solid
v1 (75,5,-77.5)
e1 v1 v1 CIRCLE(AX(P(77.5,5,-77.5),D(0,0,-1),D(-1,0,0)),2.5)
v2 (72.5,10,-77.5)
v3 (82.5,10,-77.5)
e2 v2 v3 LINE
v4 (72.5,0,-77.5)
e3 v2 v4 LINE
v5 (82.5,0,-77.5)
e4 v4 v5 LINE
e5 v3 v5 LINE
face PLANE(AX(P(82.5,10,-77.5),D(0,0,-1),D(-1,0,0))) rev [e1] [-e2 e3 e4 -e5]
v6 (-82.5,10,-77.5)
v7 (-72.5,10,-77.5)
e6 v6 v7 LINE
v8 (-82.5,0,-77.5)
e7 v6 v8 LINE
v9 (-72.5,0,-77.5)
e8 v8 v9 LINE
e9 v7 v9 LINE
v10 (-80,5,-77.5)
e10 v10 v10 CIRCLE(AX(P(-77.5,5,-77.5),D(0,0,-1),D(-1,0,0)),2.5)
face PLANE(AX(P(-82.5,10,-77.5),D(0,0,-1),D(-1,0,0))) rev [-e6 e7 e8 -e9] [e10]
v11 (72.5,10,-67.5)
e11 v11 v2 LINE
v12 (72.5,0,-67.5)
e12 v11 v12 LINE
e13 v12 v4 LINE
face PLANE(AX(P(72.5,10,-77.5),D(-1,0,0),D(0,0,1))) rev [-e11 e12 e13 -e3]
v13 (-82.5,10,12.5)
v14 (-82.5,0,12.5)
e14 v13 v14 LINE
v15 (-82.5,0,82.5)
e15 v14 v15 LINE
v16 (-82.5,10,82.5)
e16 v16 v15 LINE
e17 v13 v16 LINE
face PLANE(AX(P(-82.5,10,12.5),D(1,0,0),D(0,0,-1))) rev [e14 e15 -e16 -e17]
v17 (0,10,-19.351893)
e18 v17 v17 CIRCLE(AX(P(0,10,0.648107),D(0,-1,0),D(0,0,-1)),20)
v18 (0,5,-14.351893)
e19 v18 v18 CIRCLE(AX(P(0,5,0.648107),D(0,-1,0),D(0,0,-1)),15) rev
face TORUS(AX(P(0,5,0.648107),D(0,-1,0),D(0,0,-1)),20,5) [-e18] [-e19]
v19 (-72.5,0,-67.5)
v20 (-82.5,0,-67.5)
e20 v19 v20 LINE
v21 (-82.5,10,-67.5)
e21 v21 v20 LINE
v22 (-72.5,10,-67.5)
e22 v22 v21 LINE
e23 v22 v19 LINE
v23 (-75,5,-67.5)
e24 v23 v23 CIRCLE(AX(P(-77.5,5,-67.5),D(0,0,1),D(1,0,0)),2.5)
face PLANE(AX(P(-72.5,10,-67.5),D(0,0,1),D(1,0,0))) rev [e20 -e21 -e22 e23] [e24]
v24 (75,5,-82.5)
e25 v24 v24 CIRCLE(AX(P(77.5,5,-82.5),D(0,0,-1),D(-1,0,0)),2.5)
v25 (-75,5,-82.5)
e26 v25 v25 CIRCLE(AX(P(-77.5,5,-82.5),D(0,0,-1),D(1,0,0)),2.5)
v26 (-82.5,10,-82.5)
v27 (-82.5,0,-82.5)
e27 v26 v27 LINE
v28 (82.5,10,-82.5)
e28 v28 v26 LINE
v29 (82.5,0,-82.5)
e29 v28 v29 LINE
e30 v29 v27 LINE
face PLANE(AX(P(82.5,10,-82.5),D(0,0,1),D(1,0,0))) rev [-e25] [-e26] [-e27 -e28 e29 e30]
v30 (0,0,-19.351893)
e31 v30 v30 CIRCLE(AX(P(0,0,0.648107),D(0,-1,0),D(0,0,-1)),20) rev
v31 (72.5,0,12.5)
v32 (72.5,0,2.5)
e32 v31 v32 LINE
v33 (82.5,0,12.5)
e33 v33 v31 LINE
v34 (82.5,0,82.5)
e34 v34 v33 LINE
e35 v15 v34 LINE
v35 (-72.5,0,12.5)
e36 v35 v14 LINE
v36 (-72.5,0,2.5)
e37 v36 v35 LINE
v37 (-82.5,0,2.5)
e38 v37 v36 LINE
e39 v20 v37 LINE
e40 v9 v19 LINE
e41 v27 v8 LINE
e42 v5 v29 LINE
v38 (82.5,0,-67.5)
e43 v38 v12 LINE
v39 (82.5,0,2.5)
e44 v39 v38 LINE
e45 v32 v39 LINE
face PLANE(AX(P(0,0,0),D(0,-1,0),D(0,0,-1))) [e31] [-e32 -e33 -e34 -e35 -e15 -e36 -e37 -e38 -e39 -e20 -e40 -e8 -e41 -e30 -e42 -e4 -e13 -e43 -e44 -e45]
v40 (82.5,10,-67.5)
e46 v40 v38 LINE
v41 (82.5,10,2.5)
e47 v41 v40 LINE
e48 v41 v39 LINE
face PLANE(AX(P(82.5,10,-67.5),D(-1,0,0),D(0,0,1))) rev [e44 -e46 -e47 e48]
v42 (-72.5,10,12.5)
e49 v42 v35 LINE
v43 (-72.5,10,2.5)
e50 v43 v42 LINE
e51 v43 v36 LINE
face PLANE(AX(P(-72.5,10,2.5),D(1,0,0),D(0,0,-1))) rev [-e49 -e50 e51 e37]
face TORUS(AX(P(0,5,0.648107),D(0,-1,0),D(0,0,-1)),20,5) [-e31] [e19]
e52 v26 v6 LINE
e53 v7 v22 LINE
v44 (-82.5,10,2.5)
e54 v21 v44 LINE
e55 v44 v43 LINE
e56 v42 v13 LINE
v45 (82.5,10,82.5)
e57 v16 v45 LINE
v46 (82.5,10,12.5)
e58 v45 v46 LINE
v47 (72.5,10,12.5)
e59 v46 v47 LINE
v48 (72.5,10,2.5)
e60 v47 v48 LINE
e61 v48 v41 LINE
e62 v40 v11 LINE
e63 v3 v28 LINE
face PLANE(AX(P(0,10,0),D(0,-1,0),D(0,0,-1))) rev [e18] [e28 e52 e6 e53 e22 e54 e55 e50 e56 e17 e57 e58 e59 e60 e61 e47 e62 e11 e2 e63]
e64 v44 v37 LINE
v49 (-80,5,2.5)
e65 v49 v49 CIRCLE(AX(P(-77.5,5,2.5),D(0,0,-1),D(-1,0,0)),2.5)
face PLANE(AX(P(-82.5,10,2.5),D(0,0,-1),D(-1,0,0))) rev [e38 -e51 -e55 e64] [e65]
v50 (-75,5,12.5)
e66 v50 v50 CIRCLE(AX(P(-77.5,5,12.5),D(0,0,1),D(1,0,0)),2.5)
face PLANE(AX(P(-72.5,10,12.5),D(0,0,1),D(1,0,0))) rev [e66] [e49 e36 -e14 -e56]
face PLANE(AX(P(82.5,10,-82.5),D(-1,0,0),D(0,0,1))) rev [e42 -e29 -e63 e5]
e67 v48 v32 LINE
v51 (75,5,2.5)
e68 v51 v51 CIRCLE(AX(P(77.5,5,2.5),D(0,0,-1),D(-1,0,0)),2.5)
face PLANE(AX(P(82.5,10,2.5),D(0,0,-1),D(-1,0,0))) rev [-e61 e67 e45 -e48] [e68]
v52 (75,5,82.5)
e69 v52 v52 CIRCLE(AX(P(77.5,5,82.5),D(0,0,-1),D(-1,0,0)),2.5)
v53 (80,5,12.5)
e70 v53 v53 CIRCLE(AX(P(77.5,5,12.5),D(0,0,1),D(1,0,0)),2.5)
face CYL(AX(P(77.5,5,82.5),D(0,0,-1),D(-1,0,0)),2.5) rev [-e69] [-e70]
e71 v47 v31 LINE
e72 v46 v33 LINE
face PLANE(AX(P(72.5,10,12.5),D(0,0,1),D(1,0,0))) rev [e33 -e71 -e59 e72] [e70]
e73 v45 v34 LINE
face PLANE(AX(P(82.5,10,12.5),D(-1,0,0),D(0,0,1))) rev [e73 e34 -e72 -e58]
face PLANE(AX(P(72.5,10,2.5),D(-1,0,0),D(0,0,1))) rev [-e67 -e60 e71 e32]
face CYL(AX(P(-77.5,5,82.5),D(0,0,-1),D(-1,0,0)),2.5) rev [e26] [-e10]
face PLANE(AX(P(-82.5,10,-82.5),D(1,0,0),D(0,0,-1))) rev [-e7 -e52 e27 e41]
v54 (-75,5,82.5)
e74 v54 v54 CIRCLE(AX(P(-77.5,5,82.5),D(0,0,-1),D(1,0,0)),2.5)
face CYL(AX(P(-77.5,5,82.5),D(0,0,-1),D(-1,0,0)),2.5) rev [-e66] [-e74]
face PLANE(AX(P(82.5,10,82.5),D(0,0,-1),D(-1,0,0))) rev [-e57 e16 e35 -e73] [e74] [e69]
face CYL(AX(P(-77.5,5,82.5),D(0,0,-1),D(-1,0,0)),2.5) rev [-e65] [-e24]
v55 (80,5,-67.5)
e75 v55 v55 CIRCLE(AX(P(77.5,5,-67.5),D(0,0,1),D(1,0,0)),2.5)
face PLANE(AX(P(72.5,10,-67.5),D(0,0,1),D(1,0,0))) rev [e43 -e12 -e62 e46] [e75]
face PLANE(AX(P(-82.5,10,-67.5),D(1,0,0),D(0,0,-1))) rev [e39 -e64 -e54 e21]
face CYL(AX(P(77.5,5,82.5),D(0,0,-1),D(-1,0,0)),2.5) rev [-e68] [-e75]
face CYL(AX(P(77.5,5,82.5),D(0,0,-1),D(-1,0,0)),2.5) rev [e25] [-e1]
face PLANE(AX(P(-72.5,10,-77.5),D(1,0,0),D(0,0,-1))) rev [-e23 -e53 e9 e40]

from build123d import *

# Parameters (mm, degrees)
ESQUISSE1_R    = 15
BASE_DEPTH     = 10
ESQUISSE2_R    = 2.5
VIDE_VIS_DEPTH = 185.746447868
CONGE_CABLE_R  = 5


with BuildPart() as part:
    # Esquisse1 → BASE (new body)
    with BuildSketch(Plane(origin=(0, 0, 0), x_dir=(1, 0, 0), z_dir=(0, 1, 0))):
        Polygon((-82.5, 77.5), (-72.5, 77.5), (-72.5, 67.5), (-82.5, 67.5), (-82.5, -2.5), (-72.5, -2.5), (-72.5, -12.5), (-82.5, -12.5), (-82.5, -82.5), (82.5, -82.5), (82.5, -12.5), (72.5, -12.5), (72.5, -2.5), (82.5, -2.5), (82.5, 67.5), (72.5, 67.5), (72.5, 77.5), (82.5, 77.5), (82.5, 82.5), (-82.5, 82.5), align=None)
        with Locations(Location((0, -0.648107225, 0), (0, 0, 270))):
            Circle(ESQUISSE1_R, mode=Mode.SUBTRACT)
    extrude(amount=BASE_DEPTH)

    # Esquisse2 → VIDE VIS (cut, through all)
    with BuildSketch(Plane(origin=(0, 0, -82.5), x_dir=(-1, 0, 0), z_dir=(0, 0, -1))):
        with Locations((-77.5, 5)):
            Circle(ESQUISSE2_R)
        with Locations(Location((77.5, 5, 0), (0, 0, 180))):
            Circle(ESQUISSE2_R)
    extrude(amount=-VIDE_VIS_DEPTH, mode=Mode.SUBTRACT)

    # CONGE CABLE
    conge_cable_edges = [part.edges().sort_by_distance(p)[0] for p in [
        (0, 0, -14.351892775),
        (0, 10, -14.351892775),
    ]]
    fillet(conge_cable_edges, radius=CONGE_CABLE_R - 0.0001)  # a hair under: the kernel refuses the full size


solid = part.part
